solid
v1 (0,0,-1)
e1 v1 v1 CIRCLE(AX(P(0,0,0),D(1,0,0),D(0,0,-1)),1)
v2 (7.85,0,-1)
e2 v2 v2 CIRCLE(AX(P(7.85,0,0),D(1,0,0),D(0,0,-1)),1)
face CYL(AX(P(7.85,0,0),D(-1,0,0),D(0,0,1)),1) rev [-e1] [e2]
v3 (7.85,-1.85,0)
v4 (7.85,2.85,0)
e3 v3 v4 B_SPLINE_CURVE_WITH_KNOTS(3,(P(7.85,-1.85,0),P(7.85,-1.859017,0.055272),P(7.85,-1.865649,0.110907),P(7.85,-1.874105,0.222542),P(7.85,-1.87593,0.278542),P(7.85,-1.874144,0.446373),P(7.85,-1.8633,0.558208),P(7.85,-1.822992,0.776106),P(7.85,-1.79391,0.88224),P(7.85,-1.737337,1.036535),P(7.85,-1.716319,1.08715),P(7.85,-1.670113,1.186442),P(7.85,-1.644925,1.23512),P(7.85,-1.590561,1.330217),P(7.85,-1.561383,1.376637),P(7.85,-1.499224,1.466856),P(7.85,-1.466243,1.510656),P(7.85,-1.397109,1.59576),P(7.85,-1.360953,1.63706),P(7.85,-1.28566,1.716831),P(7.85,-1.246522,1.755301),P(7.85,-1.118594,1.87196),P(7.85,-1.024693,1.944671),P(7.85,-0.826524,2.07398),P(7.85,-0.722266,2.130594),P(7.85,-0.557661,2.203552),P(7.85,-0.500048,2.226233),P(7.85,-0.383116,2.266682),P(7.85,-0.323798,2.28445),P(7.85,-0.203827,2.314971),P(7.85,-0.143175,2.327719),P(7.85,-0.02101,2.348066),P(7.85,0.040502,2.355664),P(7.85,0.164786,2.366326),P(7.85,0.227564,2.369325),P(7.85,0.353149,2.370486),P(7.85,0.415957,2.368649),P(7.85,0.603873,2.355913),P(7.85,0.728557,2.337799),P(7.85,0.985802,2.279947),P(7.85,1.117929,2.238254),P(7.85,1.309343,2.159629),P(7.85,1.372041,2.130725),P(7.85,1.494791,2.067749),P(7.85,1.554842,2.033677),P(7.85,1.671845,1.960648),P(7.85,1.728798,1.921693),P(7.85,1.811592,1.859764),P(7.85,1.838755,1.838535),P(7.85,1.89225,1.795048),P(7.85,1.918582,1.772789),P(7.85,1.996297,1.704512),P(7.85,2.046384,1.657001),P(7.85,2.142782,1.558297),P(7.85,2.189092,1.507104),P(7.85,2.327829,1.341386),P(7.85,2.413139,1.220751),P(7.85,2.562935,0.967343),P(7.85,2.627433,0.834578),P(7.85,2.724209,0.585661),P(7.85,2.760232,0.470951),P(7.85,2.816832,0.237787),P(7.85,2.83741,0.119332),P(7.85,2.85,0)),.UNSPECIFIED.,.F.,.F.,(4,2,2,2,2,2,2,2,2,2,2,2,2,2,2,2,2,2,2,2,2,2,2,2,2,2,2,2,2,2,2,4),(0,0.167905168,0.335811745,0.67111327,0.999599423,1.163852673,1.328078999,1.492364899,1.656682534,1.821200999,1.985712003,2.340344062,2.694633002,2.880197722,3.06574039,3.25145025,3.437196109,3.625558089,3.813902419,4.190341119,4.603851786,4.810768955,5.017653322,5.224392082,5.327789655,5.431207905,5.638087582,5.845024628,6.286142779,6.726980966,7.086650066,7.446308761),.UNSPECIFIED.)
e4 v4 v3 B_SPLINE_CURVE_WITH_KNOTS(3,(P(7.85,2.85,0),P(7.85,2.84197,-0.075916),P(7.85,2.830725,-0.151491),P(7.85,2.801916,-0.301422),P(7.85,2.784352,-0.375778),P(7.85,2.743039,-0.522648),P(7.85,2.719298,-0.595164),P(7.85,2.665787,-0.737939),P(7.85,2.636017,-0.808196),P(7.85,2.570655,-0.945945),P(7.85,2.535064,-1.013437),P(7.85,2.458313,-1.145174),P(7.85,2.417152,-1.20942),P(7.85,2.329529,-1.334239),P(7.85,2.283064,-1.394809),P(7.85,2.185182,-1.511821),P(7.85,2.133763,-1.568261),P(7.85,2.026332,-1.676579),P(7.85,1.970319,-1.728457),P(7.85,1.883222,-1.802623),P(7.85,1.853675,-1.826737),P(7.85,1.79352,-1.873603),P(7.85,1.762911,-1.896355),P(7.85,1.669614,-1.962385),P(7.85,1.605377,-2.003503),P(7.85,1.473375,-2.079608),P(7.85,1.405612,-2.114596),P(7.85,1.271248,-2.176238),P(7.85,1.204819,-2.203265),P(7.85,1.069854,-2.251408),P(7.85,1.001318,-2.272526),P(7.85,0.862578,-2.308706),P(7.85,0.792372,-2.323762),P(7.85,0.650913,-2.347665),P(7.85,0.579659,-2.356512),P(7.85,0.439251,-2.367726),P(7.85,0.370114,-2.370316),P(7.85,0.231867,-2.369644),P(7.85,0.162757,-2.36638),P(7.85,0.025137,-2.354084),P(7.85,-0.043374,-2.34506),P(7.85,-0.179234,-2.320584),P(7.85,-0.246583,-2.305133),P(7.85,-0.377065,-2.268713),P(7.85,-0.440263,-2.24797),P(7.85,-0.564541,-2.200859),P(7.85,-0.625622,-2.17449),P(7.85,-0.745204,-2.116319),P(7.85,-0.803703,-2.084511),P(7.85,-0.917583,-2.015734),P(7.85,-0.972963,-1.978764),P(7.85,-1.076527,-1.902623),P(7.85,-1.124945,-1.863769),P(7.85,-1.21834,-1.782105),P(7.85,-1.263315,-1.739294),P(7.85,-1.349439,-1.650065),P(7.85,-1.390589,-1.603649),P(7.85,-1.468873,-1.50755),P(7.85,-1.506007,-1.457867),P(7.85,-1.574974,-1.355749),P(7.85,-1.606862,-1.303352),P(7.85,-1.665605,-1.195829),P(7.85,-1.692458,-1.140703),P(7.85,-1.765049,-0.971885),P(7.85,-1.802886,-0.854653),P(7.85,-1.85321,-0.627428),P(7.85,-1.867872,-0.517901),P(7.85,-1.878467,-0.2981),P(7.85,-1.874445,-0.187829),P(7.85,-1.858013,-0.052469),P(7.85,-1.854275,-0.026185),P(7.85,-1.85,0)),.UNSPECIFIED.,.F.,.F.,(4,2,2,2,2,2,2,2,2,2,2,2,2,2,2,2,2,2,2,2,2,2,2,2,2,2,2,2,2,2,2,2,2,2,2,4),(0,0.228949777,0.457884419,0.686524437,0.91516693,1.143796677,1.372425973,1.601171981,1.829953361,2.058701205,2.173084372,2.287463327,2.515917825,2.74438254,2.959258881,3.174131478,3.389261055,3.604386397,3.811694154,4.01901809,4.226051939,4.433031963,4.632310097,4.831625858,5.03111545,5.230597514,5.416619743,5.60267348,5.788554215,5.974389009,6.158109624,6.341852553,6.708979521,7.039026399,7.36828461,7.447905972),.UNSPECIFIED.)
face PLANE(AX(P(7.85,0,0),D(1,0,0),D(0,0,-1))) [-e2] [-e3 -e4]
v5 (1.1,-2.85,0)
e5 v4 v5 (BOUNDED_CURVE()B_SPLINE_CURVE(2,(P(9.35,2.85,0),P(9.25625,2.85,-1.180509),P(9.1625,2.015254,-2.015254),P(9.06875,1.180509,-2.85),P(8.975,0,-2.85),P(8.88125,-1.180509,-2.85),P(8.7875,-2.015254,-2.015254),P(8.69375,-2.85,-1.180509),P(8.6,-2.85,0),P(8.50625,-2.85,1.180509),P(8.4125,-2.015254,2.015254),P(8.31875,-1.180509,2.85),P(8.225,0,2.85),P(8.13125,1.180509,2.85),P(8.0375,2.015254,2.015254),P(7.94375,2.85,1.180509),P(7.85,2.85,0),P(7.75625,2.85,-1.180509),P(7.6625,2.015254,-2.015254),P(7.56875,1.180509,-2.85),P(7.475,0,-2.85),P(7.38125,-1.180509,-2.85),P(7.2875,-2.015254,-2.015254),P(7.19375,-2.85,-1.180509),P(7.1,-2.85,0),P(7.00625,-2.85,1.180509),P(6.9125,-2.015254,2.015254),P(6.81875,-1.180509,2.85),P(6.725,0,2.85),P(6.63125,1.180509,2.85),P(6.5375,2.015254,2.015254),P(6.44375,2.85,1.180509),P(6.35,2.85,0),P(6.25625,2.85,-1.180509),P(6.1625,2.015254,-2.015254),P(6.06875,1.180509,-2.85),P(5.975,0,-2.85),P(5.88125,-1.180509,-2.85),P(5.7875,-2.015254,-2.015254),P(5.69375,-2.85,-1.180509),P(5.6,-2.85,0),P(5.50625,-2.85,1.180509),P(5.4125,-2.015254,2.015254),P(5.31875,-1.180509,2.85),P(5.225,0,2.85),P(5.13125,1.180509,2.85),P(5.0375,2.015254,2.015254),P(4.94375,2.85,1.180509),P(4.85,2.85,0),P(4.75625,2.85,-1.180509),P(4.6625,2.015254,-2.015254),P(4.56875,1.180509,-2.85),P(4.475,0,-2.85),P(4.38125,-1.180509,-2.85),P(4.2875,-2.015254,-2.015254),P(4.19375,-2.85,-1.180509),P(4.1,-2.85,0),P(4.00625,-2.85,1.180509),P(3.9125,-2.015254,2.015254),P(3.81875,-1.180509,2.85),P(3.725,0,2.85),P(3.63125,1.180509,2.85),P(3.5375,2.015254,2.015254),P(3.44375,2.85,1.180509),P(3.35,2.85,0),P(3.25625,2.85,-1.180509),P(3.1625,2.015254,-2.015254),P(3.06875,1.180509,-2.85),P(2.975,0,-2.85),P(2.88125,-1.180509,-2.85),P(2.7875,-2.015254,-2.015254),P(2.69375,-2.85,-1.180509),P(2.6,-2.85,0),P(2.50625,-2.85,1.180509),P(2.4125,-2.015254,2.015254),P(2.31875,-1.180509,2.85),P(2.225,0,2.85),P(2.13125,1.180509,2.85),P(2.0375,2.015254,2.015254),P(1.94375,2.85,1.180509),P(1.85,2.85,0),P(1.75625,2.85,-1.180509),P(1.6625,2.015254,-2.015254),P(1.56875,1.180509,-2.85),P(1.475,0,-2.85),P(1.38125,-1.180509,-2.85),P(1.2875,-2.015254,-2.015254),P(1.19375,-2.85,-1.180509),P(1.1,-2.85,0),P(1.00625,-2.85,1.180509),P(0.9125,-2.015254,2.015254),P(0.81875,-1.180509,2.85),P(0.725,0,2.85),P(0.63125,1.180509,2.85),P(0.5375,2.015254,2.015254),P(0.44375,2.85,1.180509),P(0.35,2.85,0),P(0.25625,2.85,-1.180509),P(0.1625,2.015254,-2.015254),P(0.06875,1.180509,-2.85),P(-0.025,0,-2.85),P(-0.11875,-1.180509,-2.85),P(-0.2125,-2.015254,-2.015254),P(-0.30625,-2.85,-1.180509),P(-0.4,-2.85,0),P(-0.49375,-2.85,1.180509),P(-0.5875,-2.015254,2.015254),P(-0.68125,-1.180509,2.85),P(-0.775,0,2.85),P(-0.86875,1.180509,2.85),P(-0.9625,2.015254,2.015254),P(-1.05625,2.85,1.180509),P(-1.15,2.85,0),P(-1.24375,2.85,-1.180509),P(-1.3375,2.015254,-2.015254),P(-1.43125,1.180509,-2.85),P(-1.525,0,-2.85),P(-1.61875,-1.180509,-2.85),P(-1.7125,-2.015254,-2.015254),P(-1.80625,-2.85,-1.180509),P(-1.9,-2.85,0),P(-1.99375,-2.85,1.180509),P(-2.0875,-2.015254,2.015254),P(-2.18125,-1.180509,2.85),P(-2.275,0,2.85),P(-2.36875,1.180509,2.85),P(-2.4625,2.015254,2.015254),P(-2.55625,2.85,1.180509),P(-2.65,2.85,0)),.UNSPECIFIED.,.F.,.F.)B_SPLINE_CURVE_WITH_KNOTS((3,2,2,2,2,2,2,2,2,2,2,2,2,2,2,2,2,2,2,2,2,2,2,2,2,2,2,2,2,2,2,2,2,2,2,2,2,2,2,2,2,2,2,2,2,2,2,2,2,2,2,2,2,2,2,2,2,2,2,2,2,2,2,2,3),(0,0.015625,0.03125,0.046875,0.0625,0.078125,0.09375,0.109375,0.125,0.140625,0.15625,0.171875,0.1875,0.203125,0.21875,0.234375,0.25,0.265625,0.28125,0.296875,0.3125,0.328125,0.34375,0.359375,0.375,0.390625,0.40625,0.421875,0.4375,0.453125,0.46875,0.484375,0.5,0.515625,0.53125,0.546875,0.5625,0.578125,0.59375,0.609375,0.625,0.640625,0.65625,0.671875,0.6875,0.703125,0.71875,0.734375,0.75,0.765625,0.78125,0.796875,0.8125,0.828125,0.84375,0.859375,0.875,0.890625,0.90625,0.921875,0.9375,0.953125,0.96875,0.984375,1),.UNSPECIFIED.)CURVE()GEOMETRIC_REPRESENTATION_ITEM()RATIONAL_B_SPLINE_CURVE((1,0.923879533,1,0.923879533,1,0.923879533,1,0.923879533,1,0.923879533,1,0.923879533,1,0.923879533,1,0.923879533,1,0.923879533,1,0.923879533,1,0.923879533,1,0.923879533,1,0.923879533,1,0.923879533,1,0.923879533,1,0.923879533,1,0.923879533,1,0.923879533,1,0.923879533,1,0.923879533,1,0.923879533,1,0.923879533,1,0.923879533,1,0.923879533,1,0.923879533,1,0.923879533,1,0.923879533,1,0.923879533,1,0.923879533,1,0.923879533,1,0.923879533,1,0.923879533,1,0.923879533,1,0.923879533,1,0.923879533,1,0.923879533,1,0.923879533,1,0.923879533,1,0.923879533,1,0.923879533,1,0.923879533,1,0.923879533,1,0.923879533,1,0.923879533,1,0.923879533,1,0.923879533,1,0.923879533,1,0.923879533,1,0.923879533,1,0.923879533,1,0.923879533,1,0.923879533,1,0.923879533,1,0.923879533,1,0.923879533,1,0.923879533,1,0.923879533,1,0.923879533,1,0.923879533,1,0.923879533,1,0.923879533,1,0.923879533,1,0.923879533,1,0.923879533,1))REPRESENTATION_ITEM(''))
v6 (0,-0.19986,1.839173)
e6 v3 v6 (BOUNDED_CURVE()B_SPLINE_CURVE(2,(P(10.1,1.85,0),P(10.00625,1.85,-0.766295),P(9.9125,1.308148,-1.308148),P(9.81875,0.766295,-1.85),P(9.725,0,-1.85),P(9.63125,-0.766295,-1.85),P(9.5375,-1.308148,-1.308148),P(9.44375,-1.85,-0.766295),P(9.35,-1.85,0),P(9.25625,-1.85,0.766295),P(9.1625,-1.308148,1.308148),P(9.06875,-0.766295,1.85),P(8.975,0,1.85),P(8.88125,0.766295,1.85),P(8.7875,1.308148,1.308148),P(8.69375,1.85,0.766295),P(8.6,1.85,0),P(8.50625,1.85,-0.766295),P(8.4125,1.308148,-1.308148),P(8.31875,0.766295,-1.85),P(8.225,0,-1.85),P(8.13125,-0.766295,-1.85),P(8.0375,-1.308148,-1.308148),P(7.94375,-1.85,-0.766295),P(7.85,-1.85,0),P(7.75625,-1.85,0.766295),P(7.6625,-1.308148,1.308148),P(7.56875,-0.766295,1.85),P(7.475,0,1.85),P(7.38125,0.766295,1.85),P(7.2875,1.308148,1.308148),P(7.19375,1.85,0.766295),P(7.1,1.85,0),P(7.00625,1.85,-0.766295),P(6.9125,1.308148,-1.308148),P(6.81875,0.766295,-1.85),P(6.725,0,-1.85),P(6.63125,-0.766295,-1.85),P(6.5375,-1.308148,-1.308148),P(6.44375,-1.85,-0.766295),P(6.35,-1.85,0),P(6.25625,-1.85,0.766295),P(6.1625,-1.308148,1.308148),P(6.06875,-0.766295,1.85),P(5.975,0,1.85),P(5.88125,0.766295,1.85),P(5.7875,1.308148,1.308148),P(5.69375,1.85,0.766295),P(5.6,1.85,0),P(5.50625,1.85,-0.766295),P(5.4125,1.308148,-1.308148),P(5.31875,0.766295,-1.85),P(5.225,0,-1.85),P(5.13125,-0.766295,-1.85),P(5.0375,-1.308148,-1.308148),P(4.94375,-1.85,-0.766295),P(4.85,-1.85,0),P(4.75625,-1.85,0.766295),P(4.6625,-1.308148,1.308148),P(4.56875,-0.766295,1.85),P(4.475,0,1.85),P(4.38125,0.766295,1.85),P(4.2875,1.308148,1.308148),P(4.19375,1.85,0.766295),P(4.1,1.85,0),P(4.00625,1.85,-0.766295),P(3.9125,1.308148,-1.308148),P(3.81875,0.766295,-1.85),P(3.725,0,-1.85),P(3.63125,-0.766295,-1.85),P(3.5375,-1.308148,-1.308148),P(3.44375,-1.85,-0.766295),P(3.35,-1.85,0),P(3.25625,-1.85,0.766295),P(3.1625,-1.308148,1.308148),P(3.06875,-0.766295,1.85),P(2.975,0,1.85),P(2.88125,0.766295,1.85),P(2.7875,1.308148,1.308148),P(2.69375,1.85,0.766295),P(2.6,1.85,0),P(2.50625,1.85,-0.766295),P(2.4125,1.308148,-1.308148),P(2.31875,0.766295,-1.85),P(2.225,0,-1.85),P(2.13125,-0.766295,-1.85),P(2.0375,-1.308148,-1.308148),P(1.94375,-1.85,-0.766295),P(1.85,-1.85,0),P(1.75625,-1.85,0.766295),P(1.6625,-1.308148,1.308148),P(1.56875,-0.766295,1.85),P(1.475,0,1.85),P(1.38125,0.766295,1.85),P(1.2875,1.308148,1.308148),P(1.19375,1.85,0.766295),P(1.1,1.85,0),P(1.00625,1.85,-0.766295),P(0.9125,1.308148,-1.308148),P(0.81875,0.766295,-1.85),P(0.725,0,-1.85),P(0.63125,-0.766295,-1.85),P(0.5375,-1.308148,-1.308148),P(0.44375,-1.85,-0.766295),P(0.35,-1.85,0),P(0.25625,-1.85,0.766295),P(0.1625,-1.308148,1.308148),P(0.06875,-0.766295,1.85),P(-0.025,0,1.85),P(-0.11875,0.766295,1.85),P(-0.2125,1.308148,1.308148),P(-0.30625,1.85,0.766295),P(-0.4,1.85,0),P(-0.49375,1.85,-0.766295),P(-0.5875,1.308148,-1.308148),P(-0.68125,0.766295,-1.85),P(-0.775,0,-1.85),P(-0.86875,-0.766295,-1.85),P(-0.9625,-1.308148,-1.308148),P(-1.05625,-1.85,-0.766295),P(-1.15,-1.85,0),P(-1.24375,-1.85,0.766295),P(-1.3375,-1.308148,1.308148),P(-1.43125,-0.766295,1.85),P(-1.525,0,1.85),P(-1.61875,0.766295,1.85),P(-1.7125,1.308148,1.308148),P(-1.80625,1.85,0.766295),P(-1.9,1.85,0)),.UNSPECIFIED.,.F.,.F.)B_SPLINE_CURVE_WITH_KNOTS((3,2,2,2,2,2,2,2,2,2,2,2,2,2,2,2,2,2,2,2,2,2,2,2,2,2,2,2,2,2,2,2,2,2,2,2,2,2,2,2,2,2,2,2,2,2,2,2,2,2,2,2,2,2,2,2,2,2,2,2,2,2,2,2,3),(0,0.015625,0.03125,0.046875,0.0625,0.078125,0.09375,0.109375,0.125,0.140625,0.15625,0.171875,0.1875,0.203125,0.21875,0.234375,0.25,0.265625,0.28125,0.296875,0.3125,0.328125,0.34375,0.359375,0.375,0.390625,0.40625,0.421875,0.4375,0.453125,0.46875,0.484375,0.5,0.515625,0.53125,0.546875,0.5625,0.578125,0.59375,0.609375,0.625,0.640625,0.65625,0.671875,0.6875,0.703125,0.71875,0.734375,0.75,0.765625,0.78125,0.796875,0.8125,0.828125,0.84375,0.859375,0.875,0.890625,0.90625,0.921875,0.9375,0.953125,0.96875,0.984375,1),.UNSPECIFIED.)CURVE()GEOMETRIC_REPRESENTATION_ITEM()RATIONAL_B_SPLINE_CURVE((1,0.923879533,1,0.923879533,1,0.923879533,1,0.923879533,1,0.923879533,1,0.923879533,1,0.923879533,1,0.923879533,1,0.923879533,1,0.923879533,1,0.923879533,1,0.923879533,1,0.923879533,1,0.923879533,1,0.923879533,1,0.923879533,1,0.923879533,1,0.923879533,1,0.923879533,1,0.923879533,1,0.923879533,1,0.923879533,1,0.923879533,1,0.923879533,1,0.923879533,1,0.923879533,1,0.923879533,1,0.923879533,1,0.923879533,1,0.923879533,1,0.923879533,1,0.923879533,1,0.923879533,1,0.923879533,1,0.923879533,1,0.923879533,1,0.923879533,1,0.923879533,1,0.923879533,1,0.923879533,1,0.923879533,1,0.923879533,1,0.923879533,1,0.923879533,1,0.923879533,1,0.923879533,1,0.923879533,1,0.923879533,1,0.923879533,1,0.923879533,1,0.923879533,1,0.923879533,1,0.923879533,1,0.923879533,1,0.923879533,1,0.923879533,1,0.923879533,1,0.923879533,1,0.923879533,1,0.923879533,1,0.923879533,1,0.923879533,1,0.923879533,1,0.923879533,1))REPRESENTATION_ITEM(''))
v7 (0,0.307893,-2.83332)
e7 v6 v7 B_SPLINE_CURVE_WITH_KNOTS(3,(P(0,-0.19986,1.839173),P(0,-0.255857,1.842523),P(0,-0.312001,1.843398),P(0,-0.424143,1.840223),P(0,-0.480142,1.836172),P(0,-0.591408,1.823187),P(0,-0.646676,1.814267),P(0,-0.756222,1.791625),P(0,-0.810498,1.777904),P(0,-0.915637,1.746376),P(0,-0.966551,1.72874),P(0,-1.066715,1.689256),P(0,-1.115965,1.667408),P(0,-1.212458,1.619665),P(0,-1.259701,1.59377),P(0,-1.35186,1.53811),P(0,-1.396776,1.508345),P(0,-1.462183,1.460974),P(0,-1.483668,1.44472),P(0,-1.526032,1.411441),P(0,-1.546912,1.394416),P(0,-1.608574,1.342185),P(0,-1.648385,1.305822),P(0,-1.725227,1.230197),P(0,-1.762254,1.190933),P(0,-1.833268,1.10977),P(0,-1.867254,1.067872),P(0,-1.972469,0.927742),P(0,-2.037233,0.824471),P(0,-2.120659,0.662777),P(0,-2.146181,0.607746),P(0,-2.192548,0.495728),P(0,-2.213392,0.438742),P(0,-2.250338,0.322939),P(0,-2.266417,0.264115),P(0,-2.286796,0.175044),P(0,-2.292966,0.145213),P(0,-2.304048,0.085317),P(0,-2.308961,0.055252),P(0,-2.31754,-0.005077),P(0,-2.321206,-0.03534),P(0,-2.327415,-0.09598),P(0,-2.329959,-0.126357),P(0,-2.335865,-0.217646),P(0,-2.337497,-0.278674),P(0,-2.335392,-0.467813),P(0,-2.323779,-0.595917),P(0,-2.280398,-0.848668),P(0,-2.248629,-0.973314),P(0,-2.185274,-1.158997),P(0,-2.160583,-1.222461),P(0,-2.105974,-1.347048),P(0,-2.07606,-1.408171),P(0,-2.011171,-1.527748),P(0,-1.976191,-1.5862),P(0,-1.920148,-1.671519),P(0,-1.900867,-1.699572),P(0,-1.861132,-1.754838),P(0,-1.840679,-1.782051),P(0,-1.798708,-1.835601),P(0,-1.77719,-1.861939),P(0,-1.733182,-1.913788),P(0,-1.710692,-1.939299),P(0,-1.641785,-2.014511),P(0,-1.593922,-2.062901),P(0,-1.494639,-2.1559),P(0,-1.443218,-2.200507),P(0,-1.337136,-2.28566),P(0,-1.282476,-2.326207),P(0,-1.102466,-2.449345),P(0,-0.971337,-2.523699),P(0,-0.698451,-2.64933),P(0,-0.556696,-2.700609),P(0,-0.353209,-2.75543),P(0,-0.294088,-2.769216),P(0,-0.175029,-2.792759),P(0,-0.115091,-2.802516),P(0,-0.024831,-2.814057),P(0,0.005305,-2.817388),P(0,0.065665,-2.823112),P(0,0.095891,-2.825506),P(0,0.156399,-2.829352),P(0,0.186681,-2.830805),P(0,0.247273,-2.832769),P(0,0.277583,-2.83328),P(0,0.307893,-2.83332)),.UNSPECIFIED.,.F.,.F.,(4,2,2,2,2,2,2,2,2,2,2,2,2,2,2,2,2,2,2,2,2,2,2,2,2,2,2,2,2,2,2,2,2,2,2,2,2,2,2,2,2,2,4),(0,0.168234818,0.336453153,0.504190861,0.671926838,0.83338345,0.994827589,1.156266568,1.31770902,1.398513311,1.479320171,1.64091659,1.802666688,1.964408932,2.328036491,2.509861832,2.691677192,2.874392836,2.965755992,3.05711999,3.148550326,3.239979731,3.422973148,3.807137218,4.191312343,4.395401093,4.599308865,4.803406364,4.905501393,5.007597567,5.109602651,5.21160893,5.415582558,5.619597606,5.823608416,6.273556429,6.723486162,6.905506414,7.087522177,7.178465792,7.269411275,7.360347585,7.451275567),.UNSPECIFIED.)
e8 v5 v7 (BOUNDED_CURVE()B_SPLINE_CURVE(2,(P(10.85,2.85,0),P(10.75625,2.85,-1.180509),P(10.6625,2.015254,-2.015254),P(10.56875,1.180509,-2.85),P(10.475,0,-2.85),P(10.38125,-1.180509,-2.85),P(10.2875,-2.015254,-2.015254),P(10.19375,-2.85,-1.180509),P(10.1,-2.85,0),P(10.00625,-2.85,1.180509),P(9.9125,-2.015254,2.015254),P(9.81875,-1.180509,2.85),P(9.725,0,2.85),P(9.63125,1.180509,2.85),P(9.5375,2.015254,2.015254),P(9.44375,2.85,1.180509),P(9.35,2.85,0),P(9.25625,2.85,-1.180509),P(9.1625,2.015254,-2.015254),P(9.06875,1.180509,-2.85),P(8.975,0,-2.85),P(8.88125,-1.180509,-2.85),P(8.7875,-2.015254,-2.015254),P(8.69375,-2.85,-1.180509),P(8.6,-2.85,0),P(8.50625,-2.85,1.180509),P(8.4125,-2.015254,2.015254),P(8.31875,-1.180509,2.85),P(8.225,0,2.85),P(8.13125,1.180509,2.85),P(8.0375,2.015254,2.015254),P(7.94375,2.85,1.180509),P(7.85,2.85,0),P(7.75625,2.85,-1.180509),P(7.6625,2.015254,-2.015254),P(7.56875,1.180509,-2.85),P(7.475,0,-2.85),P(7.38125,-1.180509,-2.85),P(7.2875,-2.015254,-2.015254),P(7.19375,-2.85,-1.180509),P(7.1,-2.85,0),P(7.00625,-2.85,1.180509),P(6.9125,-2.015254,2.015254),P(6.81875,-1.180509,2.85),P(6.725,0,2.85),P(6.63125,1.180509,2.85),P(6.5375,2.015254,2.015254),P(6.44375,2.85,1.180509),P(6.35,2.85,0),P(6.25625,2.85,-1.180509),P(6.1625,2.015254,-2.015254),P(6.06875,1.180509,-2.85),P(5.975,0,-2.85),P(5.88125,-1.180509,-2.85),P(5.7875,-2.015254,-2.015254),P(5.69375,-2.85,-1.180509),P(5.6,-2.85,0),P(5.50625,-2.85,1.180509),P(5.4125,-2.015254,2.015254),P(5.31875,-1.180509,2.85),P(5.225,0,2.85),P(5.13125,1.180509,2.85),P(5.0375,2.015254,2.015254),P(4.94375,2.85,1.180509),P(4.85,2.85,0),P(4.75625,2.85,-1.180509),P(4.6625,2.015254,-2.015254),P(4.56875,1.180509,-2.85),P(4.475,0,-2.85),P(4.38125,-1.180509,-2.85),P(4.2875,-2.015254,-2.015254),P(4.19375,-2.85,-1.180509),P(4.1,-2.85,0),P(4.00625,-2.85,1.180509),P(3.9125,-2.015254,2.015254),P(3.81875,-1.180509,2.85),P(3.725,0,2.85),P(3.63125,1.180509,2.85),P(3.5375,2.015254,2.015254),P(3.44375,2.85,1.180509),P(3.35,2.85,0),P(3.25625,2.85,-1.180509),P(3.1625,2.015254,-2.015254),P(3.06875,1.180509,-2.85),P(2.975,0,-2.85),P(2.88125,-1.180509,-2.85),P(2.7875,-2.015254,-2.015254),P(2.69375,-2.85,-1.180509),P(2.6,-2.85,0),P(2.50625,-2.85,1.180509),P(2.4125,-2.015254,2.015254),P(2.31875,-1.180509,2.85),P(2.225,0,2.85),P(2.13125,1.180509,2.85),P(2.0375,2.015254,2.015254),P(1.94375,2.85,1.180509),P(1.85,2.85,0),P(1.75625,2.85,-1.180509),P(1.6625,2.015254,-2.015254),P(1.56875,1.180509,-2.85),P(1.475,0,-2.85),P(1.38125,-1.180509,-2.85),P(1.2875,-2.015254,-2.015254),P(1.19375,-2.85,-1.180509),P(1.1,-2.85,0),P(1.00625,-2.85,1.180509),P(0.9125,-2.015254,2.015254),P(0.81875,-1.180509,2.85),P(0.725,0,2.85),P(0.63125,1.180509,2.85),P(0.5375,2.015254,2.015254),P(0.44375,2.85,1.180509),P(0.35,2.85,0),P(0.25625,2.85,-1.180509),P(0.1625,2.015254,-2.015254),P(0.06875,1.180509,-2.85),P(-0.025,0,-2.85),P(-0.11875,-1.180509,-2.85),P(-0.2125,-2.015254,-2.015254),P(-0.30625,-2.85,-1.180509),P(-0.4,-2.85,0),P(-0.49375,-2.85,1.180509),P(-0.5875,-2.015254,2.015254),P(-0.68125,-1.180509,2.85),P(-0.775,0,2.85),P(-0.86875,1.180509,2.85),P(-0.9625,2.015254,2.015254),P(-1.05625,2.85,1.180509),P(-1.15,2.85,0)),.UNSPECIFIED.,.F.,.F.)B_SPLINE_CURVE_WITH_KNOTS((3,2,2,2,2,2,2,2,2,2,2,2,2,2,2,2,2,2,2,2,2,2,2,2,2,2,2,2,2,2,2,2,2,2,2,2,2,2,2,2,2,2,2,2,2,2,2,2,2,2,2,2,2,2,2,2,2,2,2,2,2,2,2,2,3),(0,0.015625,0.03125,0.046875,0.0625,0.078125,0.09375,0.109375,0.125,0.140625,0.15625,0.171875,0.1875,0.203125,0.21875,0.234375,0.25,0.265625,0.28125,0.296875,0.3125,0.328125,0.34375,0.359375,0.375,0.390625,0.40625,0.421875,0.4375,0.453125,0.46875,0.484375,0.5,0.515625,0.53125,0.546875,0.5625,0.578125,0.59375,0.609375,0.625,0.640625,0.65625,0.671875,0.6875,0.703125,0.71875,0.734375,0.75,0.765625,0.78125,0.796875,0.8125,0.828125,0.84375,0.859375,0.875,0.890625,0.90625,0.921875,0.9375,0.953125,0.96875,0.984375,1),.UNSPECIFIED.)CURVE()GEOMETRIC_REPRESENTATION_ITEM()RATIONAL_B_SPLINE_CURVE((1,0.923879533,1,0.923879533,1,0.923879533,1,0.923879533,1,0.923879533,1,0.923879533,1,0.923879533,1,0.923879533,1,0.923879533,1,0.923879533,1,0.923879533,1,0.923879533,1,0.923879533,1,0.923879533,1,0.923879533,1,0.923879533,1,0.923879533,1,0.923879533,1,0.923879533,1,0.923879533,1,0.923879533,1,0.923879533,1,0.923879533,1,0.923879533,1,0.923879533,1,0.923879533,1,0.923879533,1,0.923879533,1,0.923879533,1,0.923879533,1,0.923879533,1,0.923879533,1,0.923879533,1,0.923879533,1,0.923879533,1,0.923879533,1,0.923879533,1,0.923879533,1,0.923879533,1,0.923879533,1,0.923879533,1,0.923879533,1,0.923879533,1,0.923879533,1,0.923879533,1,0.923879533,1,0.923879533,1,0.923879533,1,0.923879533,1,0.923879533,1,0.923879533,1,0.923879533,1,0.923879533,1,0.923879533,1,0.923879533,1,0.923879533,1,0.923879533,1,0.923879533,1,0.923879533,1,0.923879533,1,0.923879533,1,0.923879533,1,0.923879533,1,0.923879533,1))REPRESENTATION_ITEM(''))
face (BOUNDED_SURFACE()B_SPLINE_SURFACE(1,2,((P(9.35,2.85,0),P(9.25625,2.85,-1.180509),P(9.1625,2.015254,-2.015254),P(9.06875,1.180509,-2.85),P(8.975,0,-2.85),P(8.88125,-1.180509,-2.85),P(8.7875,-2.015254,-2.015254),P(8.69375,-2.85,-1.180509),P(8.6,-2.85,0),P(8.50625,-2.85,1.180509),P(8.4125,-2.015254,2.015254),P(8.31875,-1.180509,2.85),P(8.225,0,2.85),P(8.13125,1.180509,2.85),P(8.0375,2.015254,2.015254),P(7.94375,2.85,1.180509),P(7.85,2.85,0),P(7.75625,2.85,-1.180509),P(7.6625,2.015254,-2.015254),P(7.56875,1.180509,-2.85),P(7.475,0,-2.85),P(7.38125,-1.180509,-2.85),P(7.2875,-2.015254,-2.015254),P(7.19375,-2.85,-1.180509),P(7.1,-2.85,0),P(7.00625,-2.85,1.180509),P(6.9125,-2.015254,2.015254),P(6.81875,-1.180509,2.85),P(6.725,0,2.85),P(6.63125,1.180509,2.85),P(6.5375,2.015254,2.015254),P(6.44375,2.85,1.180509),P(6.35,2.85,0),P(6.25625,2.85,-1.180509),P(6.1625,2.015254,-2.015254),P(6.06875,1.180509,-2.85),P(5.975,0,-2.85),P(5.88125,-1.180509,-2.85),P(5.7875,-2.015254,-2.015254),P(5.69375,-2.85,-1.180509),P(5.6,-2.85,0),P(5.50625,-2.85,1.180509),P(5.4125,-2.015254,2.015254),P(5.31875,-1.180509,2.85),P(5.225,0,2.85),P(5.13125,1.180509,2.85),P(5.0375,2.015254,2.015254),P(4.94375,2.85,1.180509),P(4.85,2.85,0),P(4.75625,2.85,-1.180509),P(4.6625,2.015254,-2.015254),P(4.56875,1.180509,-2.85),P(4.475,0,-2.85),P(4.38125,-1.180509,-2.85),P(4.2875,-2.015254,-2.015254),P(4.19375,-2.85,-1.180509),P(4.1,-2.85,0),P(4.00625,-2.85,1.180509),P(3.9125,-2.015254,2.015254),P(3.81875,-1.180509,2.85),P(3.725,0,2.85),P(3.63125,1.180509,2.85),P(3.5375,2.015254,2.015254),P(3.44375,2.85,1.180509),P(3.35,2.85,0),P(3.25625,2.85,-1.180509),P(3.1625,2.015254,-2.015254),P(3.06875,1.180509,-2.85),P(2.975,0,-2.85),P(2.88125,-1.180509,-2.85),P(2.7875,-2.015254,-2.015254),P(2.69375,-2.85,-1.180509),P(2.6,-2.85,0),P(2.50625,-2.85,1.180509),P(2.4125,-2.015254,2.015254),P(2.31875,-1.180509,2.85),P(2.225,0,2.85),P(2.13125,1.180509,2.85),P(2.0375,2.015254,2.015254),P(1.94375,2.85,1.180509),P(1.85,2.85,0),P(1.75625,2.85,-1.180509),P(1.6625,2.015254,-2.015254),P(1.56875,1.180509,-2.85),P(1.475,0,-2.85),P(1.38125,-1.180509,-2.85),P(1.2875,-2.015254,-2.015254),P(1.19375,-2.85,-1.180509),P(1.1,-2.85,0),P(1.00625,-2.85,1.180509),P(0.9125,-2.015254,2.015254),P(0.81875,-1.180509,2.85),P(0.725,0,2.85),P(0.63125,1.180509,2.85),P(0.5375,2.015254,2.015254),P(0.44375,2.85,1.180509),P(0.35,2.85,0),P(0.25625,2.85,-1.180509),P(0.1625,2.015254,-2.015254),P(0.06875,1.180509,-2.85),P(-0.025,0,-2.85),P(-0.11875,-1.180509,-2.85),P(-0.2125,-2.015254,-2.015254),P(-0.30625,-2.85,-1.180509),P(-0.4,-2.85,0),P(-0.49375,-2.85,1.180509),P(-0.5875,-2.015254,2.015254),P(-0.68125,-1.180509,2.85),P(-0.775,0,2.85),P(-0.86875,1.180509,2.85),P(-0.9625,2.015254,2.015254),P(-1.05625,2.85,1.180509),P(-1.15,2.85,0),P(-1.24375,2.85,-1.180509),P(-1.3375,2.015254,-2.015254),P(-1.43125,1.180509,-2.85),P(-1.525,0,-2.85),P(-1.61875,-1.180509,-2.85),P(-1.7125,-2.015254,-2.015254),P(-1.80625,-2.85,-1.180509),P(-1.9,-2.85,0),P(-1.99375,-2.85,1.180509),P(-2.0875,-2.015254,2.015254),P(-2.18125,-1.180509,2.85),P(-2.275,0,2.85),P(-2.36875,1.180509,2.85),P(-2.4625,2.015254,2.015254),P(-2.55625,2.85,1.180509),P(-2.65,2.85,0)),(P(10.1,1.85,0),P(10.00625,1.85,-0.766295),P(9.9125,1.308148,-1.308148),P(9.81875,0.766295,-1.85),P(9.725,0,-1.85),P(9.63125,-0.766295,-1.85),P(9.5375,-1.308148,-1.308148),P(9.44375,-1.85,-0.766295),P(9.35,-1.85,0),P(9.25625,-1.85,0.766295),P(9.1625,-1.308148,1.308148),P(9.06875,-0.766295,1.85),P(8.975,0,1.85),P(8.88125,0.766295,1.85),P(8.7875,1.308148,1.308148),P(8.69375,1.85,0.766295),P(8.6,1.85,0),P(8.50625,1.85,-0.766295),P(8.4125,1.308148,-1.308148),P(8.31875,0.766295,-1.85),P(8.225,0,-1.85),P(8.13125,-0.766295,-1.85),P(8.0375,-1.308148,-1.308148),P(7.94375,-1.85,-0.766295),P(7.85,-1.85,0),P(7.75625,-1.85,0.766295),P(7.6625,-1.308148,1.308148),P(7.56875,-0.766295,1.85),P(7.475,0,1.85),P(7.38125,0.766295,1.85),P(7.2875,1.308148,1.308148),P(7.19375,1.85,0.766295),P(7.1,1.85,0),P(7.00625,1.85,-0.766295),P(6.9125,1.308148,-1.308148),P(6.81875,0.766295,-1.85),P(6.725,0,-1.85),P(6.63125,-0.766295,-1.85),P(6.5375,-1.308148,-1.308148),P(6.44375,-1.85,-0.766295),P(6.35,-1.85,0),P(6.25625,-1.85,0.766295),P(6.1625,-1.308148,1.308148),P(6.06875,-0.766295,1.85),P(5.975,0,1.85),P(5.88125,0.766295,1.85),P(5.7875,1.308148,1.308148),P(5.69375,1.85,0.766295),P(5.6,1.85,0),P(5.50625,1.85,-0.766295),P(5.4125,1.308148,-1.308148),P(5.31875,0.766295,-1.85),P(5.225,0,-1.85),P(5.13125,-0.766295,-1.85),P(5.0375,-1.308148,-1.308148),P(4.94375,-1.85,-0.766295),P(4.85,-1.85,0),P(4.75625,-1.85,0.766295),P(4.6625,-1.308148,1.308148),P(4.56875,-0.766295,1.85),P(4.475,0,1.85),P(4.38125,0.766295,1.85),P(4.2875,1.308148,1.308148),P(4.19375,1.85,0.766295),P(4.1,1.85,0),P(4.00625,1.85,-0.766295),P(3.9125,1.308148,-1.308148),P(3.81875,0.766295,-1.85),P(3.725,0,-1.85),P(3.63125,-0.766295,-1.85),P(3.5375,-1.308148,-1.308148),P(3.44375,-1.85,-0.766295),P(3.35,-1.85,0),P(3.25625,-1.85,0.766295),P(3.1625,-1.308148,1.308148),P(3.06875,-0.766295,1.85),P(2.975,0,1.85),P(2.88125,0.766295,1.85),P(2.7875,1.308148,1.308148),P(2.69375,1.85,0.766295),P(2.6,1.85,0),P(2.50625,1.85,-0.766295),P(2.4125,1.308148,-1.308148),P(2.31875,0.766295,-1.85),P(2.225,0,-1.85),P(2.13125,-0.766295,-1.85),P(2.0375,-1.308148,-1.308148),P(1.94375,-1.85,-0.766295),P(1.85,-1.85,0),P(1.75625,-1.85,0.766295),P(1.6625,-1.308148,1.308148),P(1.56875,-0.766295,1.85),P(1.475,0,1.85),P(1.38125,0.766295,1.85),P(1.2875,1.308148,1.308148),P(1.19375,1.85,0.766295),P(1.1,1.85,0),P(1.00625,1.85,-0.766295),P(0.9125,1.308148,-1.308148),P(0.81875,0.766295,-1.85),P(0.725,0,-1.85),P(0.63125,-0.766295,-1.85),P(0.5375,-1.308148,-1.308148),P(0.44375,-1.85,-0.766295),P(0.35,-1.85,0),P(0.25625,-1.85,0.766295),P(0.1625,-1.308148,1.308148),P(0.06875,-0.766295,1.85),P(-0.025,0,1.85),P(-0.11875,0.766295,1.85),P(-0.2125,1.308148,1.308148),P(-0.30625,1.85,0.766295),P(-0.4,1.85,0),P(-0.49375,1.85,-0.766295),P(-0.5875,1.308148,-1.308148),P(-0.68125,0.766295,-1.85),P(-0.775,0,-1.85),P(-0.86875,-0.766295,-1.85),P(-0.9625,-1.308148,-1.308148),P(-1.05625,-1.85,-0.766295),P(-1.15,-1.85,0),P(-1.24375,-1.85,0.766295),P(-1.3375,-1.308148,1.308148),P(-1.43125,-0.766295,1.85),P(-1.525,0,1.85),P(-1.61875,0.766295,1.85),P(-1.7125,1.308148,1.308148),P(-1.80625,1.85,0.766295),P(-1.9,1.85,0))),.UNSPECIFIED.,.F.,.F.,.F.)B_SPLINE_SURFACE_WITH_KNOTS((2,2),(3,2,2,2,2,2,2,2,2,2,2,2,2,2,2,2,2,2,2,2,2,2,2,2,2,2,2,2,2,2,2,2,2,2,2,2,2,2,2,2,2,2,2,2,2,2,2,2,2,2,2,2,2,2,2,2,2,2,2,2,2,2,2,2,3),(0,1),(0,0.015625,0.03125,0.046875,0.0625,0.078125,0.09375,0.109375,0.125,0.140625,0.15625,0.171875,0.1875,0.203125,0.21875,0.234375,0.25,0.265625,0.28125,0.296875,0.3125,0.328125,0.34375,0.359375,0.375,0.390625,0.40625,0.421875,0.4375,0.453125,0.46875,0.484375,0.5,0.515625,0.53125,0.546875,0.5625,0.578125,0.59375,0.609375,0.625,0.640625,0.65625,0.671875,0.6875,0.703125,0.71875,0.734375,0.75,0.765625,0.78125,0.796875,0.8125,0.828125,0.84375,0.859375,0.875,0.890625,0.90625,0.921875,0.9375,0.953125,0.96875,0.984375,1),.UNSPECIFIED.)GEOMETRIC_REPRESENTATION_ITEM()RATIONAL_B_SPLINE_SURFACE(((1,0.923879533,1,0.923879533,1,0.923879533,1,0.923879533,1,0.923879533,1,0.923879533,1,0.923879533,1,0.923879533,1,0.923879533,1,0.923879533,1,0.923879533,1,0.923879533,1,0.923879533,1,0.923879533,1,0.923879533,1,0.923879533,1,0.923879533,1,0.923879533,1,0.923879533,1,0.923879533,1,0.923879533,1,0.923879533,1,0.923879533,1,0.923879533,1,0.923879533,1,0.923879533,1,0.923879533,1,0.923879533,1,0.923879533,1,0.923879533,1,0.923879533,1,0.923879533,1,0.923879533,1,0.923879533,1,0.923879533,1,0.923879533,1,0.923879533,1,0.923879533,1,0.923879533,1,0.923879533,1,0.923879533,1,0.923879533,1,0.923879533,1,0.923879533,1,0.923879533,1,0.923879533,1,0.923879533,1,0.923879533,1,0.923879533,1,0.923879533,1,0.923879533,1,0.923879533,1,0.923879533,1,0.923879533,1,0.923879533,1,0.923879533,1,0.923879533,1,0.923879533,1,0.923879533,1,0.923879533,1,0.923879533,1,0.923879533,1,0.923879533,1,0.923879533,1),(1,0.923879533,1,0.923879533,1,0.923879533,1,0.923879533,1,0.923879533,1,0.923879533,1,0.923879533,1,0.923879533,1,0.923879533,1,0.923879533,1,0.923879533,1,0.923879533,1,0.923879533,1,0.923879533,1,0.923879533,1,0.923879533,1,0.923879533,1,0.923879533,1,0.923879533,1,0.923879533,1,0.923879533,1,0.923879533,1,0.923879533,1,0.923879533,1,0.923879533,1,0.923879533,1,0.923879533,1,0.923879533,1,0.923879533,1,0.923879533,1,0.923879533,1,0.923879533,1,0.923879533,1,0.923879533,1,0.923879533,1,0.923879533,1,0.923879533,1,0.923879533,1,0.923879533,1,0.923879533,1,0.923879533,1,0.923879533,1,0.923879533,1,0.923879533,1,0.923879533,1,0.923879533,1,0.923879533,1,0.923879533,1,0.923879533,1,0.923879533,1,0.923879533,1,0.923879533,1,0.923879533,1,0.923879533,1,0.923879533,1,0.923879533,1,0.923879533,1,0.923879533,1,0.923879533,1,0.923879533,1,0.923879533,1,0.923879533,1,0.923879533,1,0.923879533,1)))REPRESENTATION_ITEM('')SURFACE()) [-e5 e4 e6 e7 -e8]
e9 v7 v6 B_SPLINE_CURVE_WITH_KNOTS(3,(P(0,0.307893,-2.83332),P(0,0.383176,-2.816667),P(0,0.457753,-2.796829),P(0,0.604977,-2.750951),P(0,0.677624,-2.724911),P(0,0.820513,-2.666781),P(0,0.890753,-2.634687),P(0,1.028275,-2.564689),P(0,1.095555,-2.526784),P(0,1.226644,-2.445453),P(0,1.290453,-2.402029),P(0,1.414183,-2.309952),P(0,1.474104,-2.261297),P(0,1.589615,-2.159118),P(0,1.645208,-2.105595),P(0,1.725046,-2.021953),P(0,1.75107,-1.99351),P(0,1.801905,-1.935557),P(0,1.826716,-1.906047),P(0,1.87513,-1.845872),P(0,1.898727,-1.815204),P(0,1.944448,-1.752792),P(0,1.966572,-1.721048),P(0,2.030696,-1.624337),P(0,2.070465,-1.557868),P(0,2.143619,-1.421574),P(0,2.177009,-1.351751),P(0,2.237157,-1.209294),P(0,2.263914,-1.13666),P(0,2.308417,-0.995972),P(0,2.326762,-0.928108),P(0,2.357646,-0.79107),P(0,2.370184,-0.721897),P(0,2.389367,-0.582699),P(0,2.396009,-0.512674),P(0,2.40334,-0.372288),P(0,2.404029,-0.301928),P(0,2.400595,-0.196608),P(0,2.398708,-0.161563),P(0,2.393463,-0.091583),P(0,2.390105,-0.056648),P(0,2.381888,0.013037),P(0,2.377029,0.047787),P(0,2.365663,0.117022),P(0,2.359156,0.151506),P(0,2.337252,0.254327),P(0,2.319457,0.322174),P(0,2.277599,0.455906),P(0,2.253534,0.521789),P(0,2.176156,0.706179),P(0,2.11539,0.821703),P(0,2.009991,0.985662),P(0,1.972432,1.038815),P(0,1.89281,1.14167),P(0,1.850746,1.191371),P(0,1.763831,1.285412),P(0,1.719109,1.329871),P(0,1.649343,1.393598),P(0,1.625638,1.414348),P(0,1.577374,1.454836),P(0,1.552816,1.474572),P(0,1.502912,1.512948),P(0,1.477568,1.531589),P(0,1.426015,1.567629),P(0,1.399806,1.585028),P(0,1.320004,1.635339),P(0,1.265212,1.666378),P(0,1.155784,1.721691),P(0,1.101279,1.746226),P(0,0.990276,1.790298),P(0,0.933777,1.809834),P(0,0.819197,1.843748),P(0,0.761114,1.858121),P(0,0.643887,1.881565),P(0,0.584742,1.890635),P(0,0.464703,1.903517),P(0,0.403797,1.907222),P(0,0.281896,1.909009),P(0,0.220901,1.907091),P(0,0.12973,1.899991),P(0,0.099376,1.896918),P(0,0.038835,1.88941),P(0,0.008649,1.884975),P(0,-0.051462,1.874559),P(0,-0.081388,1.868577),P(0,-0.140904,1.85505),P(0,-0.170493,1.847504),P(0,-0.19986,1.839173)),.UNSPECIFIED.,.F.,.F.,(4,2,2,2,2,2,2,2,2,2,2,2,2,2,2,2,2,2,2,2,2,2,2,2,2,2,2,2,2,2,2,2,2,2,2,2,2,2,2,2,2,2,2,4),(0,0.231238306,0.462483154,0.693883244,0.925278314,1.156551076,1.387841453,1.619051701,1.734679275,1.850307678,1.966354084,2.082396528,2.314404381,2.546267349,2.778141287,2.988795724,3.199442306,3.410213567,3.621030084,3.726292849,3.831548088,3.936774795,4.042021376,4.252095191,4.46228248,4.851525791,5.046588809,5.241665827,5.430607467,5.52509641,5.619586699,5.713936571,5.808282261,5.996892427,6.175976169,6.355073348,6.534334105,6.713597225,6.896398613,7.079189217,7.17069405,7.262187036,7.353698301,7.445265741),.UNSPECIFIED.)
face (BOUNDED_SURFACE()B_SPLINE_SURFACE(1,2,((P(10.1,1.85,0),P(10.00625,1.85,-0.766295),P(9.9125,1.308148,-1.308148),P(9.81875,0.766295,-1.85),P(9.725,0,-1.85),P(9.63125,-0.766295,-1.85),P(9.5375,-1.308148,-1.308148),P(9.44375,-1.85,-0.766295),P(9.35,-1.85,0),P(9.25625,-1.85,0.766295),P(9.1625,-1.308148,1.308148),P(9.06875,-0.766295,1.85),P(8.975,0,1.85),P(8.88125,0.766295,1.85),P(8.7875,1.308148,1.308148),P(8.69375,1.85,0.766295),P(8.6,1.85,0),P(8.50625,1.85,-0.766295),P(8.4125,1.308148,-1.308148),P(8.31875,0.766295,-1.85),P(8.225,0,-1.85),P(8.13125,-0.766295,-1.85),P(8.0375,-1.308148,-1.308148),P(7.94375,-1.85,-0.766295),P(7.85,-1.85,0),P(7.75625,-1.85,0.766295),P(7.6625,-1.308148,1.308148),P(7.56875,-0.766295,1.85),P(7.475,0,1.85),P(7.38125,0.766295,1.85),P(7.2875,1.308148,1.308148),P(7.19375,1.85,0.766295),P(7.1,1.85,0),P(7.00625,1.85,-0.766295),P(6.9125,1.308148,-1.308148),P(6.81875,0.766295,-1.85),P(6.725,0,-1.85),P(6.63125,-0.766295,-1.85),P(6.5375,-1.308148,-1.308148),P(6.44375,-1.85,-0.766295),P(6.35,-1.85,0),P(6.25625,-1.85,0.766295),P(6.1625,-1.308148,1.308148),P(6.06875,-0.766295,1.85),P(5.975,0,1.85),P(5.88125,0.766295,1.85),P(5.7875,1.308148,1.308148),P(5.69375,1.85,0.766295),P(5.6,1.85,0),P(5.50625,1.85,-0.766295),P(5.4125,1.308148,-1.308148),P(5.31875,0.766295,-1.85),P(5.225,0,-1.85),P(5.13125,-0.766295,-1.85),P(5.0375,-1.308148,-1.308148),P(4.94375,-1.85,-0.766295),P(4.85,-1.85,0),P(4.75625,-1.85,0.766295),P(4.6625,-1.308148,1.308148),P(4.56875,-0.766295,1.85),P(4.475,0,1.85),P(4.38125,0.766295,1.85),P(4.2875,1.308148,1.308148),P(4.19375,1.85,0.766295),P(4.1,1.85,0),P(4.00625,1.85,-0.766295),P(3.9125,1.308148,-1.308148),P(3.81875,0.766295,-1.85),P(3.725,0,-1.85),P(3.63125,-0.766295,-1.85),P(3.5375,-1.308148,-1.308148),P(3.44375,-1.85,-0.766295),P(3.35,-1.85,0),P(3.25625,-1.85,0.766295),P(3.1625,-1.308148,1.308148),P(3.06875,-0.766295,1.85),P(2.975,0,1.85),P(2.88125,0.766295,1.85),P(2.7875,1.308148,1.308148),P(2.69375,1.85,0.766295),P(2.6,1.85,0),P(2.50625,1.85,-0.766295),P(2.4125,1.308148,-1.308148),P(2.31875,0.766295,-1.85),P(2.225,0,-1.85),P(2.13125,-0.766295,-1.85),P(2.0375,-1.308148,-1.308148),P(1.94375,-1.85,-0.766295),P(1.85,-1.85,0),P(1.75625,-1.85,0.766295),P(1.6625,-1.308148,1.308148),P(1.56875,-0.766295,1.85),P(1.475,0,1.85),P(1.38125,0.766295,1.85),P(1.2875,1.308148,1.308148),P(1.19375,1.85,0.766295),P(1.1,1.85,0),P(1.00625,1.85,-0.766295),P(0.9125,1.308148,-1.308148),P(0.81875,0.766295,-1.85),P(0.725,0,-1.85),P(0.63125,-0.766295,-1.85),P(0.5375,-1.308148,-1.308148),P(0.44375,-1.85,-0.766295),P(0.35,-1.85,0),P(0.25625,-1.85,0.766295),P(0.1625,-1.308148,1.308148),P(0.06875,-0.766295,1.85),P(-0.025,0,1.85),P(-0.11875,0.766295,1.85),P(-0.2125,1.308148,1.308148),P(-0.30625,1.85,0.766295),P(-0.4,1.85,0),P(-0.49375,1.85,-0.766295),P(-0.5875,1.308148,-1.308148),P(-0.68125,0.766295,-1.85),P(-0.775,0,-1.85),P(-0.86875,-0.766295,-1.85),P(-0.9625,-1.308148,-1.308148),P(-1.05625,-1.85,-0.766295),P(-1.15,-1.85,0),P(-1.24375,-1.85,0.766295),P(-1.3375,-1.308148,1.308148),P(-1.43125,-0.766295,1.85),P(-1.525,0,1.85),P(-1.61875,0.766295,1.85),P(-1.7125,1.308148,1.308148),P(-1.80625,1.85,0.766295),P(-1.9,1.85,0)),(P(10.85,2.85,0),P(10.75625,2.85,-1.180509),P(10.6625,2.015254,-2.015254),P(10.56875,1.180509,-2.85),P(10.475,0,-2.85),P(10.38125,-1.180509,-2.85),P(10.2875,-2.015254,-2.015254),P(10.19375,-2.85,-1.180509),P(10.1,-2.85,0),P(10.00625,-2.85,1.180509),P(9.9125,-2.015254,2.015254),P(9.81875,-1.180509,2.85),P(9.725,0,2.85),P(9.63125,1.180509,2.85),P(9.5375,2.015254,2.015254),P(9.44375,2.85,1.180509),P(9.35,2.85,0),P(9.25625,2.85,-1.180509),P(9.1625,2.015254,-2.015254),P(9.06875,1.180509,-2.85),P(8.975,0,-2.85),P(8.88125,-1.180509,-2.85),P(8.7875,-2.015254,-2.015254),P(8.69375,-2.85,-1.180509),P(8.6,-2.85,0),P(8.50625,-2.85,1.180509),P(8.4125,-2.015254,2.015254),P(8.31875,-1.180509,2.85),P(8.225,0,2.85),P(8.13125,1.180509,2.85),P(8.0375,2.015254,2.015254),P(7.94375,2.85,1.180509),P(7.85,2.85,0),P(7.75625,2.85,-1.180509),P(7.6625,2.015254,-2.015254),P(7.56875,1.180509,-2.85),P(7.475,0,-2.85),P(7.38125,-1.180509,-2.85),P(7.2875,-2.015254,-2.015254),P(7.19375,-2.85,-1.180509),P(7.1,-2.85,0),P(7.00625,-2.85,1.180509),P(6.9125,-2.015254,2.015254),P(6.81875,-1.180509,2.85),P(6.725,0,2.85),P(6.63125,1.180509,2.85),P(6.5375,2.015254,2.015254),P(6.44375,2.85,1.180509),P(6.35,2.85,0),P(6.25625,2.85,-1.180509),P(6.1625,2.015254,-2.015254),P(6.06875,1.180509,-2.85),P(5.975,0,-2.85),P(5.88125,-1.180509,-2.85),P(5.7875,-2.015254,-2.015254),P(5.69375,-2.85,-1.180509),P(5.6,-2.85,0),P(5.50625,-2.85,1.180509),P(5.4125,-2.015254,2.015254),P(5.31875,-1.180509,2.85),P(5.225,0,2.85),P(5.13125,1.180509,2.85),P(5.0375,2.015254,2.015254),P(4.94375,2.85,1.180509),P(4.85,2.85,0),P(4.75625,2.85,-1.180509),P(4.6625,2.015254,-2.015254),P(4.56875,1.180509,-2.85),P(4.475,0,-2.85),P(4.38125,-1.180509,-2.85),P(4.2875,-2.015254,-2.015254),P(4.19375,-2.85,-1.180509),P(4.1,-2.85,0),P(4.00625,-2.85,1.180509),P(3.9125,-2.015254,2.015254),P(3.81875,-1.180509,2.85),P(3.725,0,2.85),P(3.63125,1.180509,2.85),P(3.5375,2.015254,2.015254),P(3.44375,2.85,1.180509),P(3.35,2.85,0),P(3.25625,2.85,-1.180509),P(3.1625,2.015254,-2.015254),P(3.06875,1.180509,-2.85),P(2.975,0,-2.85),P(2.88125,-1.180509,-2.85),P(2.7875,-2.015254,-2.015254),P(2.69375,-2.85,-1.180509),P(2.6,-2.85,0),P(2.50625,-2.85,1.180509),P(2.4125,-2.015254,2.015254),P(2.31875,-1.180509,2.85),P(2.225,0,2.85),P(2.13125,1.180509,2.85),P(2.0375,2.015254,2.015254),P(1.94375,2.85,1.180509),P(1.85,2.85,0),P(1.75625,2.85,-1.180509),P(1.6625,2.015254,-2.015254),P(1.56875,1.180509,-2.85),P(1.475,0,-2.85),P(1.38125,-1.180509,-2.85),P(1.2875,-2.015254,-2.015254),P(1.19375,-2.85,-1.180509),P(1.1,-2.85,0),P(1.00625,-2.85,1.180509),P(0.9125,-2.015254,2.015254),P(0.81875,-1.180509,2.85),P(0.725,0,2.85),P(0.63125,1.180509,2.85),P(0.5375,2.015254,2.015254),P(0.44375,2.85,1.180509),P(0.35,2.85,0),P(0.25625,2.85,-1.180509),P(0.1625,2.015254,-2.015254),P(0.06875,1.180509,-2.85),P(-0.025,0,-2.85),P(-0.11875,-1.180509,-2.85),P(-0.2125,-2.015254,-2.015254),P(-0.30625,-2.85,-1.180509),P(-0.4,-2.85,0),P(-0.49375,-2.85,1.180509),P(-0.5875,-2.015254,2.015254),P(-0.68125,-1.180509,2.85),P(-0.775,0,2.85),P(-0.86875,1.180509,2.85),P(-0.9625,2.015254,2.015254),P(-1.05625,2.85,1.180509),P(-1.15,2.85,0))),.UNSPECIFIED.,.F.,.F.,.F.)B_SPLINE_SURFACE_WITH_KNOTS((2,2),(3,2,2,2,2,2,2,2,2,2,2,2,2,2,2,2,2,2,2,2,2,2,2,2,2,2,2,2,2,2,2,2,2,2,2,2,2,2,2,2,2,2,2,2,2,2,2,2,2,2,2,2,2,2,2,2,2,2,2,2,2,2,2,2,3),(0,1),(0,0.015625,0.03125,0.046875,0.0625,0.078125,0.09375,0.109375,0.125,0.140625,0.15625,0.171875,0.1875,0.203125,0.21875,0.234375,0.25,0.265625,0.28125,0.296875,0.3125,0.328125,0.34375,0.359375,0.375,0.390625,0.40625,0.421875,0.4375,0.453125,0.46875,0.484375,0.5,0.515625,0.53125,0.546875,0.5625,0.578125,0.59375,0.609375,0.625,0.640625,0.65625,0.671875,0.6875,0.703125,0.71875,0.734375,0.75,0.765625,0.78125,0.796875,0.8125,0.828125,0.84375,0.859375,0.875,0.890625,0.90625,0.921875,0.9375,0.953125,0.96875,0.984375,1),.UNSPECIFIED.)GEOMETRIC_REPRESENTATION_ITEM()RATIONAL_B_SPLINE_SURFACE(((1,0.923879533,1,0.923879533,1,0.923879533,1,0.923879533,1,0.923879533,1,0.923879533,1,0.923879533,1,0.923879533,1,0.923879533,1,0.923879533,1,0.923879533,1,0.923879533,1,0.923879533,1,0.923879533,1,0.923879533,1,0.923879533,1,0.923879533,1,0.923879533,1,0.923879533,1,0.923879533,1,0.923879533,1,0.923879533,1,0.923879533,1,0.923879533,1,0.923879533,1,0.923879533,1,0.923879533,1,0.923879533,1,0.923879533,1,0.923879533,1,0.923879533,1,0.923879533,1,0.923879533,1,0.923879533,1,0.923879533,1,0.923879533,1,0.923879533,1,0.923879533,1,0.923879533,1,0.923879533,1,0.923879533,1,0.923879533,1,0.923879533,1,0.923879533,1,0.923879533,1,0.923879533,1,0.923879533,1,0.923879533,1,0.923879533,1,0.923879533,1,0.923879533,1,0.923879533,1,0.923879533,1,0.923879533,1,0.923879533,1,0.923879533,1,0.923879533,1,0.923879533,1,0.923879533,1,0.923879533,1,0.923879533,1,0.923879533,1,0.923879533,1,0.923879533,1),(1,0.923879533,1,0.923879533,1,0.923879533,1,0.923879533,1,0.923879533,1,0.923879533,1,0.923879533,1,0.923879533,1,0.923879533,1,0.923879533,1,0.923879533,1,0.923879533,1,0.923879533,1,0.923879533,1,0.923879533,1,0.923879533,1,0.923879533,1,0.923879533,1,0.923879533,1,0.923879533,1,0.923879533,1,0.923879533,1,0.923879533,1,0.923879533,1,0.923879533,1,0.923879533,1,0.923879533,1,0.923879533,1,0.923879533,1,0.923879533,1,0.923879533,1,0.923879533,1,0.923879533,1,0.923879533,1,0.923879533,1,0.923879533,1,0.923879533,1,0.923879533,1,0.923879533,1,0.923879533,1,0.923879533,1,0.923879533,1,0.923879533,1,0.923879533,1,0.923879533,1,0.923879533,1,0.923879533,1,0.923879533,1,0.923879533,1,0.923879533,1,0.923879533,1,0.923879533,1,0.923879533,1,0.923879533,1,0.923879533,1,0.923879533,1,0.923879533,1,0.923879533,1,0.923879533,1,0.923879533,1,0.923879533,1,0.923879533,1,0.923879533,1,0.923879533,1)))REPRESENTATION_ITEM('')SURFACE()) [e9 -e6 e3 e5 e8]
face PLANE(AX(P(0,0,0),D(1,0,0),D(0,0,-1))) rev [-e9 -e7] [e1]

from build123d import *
from build123d.topology import SkipClean

# Parameters (mm, degrees)
SKETCH1_R           = 2.85
SKETCH1_R_2         = 1
BOSS_EXTRUDE1_DEPTH = 7.85
CUT_SWEEP3_PITCH    = 1.5


with BuildPart() as part:
    # Sketch1 → Boss-Extrude1 (new body)
    with BuildSketch(Plane(origin=(0, 0, 0), x_dir=(0, 0, -1), z_dir=(1, 0, 0))):
        Circle(SKETCH1_R)
        Circle(SKETCH1_R_2, mode=Mode.SUBTRACT)
    extrude(amount=BOSS_EXTRUDE1_DEPTH)

    # Cut-Sweep3: the profile of Sketch3 screwed along a right-hand helix of 6.5 turns, 8 arcs to a turn; built about Z, then put on its axis
    with SkipClean():  # the faces are left unmerged after this step: merging them gives an invalid solid
        cut_sweep3_z = Axis((0, 0, 0), (0, 0, 1))
        cut_sweep3_corners = [(2.85, 0, 0), (1.85, 0, -0.75), (2.85, 0, -1.5), (3.101496865, 0, -1.5), (3.101496865, 0, 0)]
        with BuildLine(mode=Mode.PRIVATE) as cut_sweep3_profile:
            Line(cut_sweep3_corners[0], cut_sweep3_corners[1])
            Line(cut_sweep3_corners[1], cut_sweep3_corners[2])
            Line(cut_sweep3_corners[2], cut_sweep3_corners[3])
            Line(cut_sweep3_corners[3], cut_sweep3_corners[4])
            Line(cut_sweep3_corners[4], cut_sweep3_corners[0])
        cut_sweep3_cap = Face(cut_sweep3_profile.wire())
        cut_sweep3_turn_angles = [0, 22.5, 45, 67.5, 90, 112.5, 135, 157.5, 180, 202.5, 225, 247.5, 270, 292.5, 315, 337.5, 360]
        cut_sweep3_turn_weights = [1, 0.9238795325112867, 1, 0.9238795325112867, 1, 0.9238795325112867, 1, 0.9238795325112867, 1, 0.9238795325112867, 1, 0.9238795325112867, 1, 0.9238795325112867, 1, 0.9238795325112867, 1]
        cut_sweep3_turn_rails = [Edge.make_bspline([Vector(p[0], p[1], 0).rotate(cut_sweep3_z, cut_sweep3_turn_angles[k]) / cut_sweep3_turn_weights[k] + Vector(0, 0, p[2] + CUT_SWEEP3_PITCH * cut_sweep3_turn_angles[k] / 360) for k in range(17)], [0, 0, 0, 1, 1, 2, 2, 3, 3, 4, 4, 5, 5, 6, 6, 7, 7, 8, 8, 8], 2, cut_sweep3_turn_weights) for p in cut_sweep3_corners]
        cut_sweep3_turn_sides = [Face.make_surface_from_curves(cut_sweep3_turn_rails[p[0]], cut_sweep3_turn_rails[p[1]]) for p in [(0, 1), (1, 2), (2, 3), (3, 4), (4, 0)]]
        cut_sweep3_turn = Solid(Shell([*cut_sweep3_turn_sides, cut_sweep3_cap, cut_sweep3_cap.rotate(cut_sweep3_z, 360).moved(Location((0, 0, CUT_SWEEP3_PITCH * 360 / 360)))]))
        cut_sweep3_last_angles = [2160, 2182.5, 2205, 2227.5, 2250, 2272.5, 2295, 2317.5, 2340]
        cut_sweep3_last_weights = [1, 0.9238795325112867, 1, 0.9238795325112867, 1, 0.9238795325112867, 1, 0.9238795325112442, 1]
        cut_sweep3_last_rails = [Edge.make_bspline([Vector(p[0], p[1], 0).rotate(cut_sweep3_z, cut_sweep3_last_angles[k]) / cut_sweep3_last_weights[k] + Vector(0, 0, p[2] + CUT_SWEEP3_PITCH * cut_sweep3_last_angles[k] / 360) for k in range(9)], [0, 0, 0, 1, 1, 2, 2, 3, 3, 4, 4, 4], 2, cut_sweep3_last_weights) for p in cut_sweep3_corners]
        cut_sweep3_last_sides = [Face.make_surface_from_curves(cut_sweep3_last_rails[p[0]], cut_sweep3_last_rails[p[1]]) for p in [(0, 1), (1, 2), (2, 3), (3, 4), (4, 0)]]
        cut_sweep3_last = Solid(Shell([*cut_sweep3_last_sides, cut_sweep3_cap.rotate(cut_sweep3_z, 2160).moved(Location((0, 0, CUT_SWEEP3_PITCH * 2160 / 360))), cut_sweep3_cap.rotate(cut_sweep3_z, 2340).moved(Location((0, 0, CUT_SWEEP3_PITCH * 2340 / 360)))]))
        cut_sweep3_each = [*[cut_sweep3_turn.moved(Location((0, 0, CUT_SWEEP3_PITCH * i))) for i in range(6)], cut_sweep3_last]
        add(Plane(origin=(7.85, 0, 0), x_dir=(0, 1, 0), z_dir=(-1, 0, 0)) * Compound([cut_sweep3_each[i] for i in range(0, 7, 2)]), mode=Mode.SUBTRACT)
        add(Plane(origin=(7.85, 0, 0), x_dir=(0, 1, 0), z_dir=(-1, 0, 0)) * Compound([cut_sweep3_each[i] for i in range(1, 7, 2)]), mode=Mode.SUBTRACT)


solid = part.part
